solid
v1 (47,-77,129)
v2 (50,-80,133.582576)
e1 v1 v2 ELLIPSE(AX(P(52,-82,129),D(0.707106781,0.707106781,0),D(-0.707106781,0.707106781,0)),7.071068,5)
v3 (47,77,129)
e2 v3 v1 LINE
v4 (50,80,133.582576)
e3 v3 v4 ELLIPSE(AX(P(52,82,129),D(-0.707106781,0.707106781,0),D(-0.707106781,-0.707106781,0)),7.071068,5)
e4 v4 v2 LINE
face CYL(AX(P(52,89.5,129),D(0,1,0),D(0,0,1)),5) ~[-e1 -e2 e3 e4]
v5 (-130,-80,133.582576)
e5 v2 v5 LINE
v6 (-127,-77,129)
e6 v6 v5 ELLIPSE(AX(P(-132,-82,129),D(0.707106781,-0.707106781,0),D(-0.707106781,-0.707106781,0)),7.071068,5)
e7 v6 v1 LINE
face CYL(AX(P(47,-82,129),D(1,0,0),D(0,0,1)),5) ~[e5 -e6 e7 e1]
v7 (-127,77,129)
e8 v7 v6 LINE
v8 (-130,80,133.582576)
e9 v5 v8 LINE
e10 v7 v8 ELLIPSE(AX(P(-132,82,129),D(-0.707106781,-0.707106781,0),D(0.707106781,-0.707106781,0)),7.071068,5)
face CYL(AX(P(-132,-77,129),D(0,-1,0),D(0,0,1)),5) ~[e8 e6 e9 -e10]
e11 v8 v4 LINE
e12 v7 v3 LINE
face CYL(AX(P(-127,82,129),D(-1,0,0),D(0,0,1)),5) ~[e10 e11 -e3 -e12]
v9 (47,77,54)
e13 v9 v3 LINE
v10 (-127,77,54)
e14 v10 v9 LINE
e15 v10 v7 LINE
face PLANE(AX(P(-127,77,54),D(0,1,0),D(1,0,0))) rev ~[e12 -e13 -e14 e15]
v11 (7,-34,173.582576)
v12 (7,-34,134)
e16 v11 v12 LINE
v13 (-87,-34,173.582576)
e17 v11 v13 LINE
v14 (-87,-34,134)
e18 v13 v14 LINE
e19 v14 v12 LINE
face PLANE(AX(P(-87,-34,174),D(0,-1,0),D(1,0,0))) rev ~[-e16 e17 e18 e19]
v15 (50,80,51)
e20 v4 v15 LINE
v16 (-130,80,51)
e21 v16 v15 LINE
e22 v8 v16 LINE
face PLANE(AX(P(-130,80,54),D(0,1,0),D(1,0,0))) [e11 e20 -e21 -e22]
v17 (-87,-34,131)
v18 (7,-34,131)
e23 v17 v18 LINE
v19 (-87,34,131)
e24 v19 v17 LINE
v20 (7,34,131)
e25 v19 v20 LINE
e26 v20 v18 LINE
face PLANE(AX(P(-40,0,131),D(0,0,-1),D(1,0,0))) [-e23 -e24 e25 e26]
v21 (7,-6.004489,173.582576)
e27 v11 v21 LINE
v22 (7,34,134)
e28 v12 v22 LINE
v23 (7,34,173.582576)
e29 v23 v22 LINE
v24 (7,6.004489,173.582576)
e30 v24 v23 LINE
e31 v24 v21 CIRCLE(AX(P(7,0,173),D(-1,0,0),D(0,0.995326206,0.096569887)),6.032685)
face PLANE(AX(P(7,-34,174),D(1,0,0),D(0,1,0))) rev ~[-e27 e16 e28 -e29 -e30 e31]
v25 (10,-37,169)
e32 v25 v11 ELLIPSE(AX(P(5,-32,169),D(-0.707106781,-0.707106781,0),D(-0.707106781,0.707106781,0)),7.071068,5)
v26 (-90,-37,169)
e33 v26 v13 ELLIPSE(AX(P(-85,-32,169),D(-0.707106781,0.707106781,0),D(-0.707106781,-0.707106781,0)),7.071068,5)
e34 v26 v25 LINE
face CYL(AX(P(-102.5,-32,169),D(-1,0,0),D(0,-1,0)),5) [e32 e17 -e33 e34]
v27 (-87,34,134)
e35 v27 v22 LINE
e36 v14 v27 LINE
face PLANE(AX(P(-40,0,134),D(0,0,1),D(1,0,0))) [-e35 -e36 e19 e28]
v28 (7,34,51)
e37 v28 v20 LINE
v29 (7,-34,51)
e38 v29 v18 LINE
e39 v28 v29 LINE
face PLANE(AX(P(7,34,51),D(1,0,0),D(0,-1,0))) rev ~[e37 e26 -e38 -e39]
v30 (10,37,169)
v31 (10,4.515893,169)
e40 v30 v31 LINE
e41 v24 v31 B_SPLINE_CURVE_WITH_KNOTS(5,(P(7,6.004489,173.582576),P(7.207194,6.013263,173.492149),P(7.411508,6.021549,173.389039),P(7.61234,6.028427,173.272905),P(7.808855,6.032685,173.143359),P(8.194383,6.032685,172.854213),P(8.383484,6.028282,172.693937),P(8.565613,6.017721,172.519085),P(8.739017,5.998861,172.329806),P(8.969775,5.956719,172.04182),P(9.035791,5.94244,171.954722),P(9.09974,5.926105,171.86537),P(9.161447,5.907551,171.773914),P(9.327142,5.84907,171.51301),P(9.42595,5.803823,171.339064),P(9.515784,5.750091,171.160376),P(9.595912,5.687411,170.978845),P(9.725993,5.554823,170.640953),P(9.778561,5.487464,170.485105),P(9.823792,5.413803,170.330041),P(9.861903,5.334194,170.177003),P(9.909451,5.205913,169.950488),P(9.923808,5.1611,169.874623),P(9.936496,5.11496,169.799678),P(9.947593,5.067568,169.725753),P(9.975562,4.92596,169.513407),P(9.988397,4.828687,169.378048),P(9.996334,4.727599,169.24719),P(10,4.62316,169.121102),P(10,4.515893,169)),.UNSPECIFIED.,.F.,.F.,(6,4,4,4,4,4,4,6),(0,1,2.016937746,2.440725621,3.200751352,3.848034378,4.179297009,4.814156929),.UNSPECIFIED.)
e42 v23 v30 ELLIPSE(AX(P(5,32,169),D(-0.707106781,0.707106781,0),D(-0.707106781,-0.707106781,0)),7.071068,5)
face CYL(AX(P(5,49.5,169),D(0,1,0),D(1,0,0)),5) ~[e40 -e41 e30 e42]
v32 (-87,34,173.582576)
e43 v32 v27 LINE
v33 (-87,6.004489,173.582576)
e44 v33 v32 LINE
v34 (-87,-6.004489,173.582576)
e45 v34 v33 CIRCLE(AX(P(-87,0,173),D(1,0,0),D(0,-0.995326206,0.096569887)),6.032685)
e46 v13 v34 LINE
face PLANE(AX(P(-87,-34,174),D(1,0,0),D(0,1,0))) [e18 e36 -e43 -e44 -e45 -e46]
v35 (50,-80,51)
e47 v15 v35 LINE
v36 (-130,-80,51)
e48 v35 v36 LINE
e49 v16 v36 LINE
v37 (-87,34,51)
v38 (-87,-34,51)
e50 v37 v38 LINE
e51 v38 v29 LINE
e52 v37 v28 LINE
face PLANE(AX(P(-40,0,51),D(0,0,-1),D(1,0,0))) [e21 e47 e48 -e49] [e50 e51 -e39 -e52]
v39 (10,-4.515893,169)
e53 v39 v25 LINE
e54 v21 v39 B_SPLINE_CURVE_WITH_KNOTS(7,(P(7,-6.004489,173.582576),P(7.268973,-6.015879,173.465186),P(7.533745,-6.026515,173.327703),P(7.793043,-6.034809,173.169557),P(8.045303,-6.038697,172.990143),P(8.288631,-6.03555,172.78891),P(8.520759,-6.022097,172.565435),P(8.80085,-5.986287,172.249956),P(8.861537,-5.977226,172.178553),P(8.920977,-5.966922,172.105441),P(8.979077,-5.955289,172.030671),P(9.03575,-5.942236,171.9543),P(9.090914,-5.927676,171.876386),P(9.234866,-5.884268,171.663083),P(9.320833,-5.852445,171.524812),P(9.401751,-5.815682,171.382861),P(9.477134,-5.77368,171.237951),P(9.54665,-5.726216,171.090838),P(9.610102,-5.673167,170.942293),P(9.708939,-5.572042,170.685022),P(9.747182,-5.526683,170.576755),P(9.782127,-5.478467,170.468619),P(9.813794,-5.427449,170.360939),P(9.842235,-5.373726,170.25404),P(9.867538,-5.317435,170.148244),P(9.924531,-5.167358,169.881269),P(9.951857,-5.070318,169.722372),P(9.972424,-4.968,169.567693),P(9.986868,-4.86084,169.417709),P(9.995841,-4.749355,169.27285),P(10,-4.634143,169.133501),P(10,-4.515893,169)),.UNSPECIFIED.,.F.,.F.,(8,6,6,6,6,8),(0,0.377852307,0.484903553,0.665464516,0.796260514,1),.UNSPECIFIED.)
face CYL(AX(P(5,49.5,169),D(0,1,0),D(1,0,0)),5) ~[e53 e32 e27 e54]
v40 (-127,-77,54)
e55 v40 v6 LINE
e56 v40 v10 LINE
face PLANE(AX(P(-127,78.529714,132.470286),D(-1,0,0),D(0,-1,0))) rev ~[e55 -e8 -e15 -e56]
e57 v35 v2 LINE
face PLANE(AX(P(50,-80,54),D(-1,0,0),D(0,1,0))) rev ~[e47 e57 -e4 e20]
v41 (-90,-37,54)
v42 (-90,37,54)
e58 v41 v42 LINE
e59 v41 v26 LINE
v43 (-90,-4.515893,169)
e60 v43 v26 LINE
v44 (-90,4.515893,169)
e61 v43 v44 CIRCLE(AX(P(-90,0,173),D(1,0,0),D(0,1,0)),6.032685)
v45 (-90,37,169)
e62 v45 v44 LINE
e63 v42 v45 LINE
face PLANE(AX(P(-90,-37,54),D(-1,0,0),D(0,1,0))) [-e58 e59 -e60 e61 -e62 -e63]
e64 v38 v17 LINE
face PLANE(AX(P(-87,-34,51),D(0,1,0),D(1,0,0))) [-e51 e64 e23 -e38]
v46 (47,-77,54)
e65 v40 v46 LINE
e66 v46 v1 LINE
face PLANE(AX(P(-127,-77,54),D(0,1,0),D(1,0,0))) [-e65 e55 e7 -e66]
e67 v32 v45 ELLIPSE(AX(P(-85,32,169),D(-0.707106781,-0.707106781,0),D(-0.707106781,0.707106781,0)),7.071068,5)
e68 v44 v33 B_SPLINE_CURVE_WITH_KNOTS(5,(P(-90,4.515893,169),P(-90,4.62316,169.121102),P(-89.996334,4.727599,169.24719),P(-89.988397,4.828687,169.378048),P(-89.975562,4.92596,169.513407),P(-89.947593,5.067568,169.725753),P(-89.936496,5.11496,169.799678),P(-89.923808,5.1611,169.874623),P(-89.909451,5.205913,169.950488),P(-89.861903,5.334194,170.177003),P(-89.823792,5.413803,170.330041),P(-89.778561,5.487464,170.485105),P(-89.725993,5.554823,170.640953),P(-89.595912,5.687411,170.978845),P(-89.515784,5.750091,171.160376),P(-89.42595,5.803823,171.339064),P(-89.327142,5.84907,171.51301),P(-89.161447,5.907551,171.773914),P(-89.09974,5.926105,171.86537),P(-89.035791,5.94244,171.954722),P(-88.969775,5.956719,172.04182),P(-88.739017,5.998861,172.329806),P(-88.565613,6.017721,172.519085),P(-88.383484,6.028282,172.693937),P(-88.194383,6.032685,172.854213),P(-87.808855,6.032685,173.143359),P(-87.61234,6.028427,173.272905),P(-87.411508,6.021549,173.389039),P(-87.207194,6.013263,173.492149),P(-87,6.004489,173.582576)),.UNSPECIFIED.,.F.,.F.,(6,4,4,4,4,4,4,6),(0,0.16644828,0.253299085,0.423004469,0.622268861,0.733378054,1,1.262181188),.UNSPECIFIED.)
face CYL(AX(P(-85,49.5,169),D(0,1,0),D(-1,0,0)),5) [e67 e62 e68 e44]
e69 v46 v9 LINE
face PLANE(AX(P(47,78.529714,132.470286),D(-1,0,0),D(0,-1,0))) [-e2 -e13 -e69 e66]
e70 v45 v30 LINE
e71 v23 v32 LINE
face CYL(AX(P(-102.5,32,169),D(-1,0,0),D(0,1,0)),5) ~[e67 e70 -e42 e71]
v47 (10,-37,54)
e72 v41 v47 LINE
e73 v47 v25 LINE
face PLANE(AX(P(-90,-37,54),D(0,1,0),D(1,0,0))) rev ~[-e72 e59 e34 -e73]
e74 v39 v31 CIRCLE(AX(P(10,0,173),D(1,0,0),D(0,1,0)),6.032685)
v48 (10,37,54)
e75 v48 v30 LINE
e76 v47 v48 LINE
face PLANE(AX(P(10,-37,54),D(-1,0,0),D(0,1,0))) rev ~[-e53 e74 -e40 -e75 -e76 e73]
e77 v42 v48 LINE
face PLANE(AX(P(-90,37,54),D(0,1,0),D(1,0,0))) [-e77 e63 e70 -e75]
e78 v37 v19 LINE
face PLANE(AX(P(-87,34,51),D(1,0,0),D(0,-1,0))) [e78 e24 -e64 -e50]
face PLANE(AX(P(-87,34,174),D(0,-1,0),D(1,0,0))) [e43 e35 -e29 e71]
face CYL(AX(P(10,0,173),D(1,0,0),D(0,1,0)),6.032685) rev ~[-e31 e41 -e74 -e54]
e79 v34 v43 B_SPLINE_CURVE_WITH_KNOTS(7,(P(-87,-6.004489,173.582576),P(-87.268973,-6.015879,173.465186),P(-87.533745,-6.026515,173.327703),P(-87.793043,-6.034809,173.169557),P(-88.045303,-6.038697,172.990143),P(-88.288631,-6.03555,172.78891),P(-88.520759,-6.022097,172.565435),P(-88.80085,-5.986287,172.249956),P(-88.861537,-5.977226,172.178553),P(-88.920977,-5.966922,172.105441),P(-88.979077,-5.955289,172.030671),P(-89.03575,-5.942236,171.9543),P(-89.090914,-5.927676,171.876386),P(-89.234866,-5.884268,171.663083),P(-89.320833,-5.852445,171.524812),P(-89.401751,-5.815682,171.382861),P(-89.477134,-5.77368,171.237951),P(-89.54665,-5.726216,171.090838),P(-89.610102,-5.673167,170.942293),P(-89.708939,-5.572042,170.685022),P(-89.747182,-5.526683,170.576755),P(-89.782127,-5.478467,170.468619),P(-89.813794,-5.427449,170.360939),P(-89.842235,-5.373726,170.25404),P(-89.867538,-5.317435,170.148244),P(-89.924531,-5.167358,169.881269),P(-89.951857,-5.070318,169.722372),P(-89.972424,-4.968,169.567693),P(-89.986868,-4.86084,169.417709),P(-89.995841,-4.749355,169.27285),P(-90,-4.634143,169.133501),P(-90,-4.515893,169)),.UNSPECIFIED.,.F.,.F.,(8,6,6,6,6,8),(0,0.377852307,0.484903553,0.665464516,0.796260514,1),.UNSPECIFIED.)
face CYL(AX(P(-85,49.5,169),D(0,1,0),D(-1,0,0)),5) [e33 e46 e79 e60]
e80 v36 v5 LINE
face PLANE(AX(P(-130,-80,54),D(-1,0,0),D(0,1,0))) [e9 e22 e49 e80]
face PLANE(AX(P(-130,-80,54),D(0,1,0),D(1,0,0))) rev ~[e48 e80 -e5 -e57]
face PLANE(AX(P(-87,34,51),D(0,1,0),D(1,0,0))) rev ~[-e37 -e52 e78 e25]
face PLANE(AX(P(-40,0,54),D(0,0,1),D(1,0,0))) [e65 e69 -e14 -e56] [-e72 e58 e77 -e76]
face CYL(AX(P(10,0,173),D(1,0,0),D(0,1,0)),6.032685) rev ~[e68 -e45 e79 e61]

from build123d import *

# Parameters (mm, degrees)
F0_W          = 180
F0_H          = 160
F1_DEPTH      = 1
F2_W          = 10
F2_H          = 10
F3_DEPTH      = 50
F4_T          = 1
F4_T3_DEPTH   = 12
F4_T5_DEPTH   = 12
F4_T7_DEPTH   = 12
F4_T9_DEPTH   = 12
F5_W          = 180
F5_H          = 160
F6_DEPTH      = 3
F7_W          = 180
F7_H          = 160
F7_W_2        = 174
F7_H_2        = 154
F8_DEPTH      = 80
F9_W          = 100
F9_H          = 74
F10_DEPTH     = 120
F11_W         = 94
F11_H         = 68
F12_DEPTH     = 40
F14_T1_DEPTH  = 125
F14_T3_DEPTH  = 99
F14_T5_DEPTH  = 174
F14_T7_DEPTH  = 154
F14_T13_DEPTH = 166.5
F14_T19_DEPTH = 186.5
F14_T28_DEPTH = 166.5
F14_T34_DEPTH = 186.5
F14_T43_DEPTH = 186.5
F14_T49_DEPTH = 166.5
F14_T58_DEPTH = 166.5
F14_T64_DEPTH = 186.5
F15_R         = 6.0326848408
F16_DEPTH     = 500
F17_W         = 180
F17_H         = 160
F18_DEPTH     = 51
F13_W         = 94
F13_H         = 68
F19_DEPTH     = 80


# Not quite as in the source:
# - a fillet or chamfer that OpenCascade refuses, or shapes differently, is made with other operations: its cross-section is extruded or revolved along the edge and cut away or added
# - a shell that OpenCascade refuses in one call is made with other operations: the cavity is built on its own and cut out


with BuildPart() as f1:
    # F0 (on Top) → F1 (new body)
    with BuildSketch(Plane.XY):
        with Locations((-40, 0)):
            Rectangle(F0_W, F0_H)
    extrude(amount=F1_DEPTH)

    # F2 (on face) → F3 (join)
    with BuildSketch(Plane.XY.offset(1)):
        with Locations((-125, 75)):
            Rectangle(F2_W, F2_H)
        with Locations((45, 75)):
            Rectangle(F2_W, F2_H)
        with Locations((-125, -75)):
            Rectangle(F2_W, F2_H)
        with Locations((45, -75)):
            Rectangle(F2_W, F2_H)
    extrude(amount=F3_DEPTH)

    # F4: shell of thickness 1, made by hand


with BuildPart() as f4_core1:
    # F4_t2: copy of F1
    add(f1.part)

    # the walls: a layer under each face that stays
    f4_faces = [f4_core1.faces().sort_by_distance(p)[0] for p in [
        (44, 80, 49.3),
        (-124, -80, 49.3),
        (45, -75, 51),
        (45, -70, 26),
        (40, -75, 26),
        (-120, -75, 26),
        (-125, -70, 26),
        (-125, -75, 51),
        (-130, 74.6666666667, 49.3),
        (-125, 70, 26),
        (-125, 75, 51),
        (-120, 75, 26),
        (-40, 0, 1),
        (45, 70, 26),
        (40, 75, 26),
        (45, 75, 51),
        (50, -74.6666666667, 49.3),
    ]]
    thicken(f4_faces, amount=-F4_T, mode=Mode.SUBTRACT)

    # F4_s4 → F4_t3 (cut)
    with BuildSketch(Plane.YZ.offset(39)):
        Polygon((-69.99, 1.01), (-71, 1), (-71, 0), (-70, 0), align=None)
        Polygon((69.99, 1.01), (70, 0), (71, 0), (71, 1), align=None)
    extrude(amount=F4_T3_DEPTH, mode=Mode.SUBTRACT)

    # F4_s6 → F4_t5 (cut)
    with BuildSketch(Plane.XZ.offset(69)):
        Polygon((39.99, 1.01), (41, 1), (41, 0), (40, 0), align=None)
        Polygon((-119.99, 1.01), (-121, 1), (-121, 0), (-120, 0), align=None)
    extrude(amount=F4_T5_DEPTH, mode=Mode.SUBTRACT)

    # F4_s8 → F4_t7 (cut)
    with BuildSketch(Plane.YZ.offset(-131)):
        Polygon((-69.99, 1.01), (-71, 1), (-71, 0), (-70, 0), align=None)
        Polygon((69.99, 1.01), (71, 1), (71, 0), (70, 0), align=None)
    extrude(amount=F4_T7_DEPTH, mode=Mode.SUBTRACT)

    # F4_s10 → F4_t9 (cut)
    with BuildSketch(Plane.XZ.offset(-81)):
        Polygon((-119.99, 1.01), (-121, 1), (-121, 0), (-120, 0), align=None)
        Polygon((39.99, 1.01), (40, 0), (41, 0), (41, 1), align=None)
    extrude(amount=F4_T9_DEPTH, mode=Mode.SUBTRACT)


with BuildPart() as f1_1:
    add(f1.part)

    # what is left inside the walls is the cavity
    f4_cavity = [f4_core1.part.solids().sort_by_distance(p)[0] for p in [
        (45, 78.99, 33.333333),
        (-125, 78.99, 33.333333),
        (48.99, -75, 33.333333),
        (-123.666667, -71.01, 25),
    ]]
    add(f4_cavity, mode=Mode.SUBTRACT)

    # F5 (on face) → F6 (join)
    with BuildSketch(Plane.XY.offset(51)):
        with Locations((-40, 0)):
            Rectangle(F5_W, F5_H)
    extrude(amount=F6_DEPTH)

    # F7 (on face) → F8 (join)
    with BuildSketch(Plane.XY.offset(54)):
        with Locations((-40, 0)):
            Rectangle(F7_W, F7_H)
        with Locations((-40, 0)):
            Rectangle(F7_W_2, F7_H_2, mode=Mode.SUBTRACT)
    extrude(amount=F8_DEPTH)

    # F9 (on face) → F10 (join)
    with BuildSketch(Plane.XY.offset(54)):
        with Locations((-40, 0)):
            Rectangle(F9_W, F9_H)
    extrude(amount=F10_DEPTH)

    # F11 (on face) → F12 (cut)
    with BuildSketch(Plane.XY.offset(174)):
        with Locations((-40, 0)):
            Rectangle(F11_W, F11_H)
    extrude(amount=-F12_DEPTH, mode=Mode.SUBTRACT)

    # F14: fillet of radius 5 on 8 edges, made by hand

    # F14_s2 → F14_t1 (cut)
    with BuildSketch(Plane.YZ.offset(-102.5)):
        with BuildLine():
            ThreePointArc((-37, 169), (-35.5355339059, 172.5355339059), (-32, 174))
            Line((-32, 174), (-37, 174))
            Line((-37, 174), (-37, 169))
        make_face()
        with BuildLine():
            ThreePointArc((37, 169), (35.5355339059, 172.5355339059), (32, 174))
            Line((32, 174), (37, 174))
            Line((37, 174), (37, 169))
        make_face()
    extrude(amount=F14_T1_DEPTH, mode=Mode.SUBTRACT)

    # F14_s4 → F14_t3 (cut)
    with BuildSketch(Plane.XZ.offset(-49.5)):
        with BuildLine():
            ThreePointArc((-90, 169), (-88.5355339059, 172.5355339059), (-85, 174))
            Line((-85, 174), (-90, 174))
            Line((-90, 174), (-90, 169))
        make_face()
        with BuildLine():
            ThreePointArc((10, 169), (8.5355339059, 172.5355339059), (5, 174))
            Line((5, 174), (10, 174))
            Line((10, 174), (10, 169))
        make_face()
    extrude(amount=F14_T3_DEPTH, mode=Mode.SUBTRACT)

    # F14_s6 → F14_t5 (cut)
    with BuildSketch(Plane.YZ.offset(-127)):
        with BuildLine():
            ThreePointArc((-82, 134), (-78.4644660941, 132.5355339059), (-77, 129))
            Line((-77, 129), (-77, 134))
            Line((-77, 134), (-82, 134))
        make_face()
        with BuildLine():
            ThreePointArc((82, 134), (78.4644660941, 132.5355339059), (77, 129))
            Line((77, 129), (77, 134))
            Line((77, 134), (82, 134))
        make_face()
    extrude(amount=F14_T5_DEPTH, mode=Mode.SUBTRACT)

    # F14_s8 → F14_t7 (cut)
    with BuildSketch(Plane.XZ.offset(-77)):
        with BuildLine():
            ThreePointArc((52, 134), (48.4644660941, 132.5355339059), (47, 129))
            Line((47, 129), (47, 134))
            Line((47, 134), (52, 134))
        make_face()
        with BuildLine():
            ThreePointArc((-132, 134), (-128.4644660941, 132.5355339059), (-127, 129))
            Line((-127, 129), (-127, 134))
            Line((-127, 134), (-132, 134))
        make_face()
    extrude(amount=F14_T7_DEPTH, mode=Mode.SUBTRACT)


with BuildPart() as f14_tool11:
    # F14_s12 → F14_t13 (new body)
    with BuildSketch(Plane.XZ.offset(-77)):
        with BuildLine():
            ThreePointArc((52, 134), (48.4644660941, 132.5355339059), (47, 129))
            Line((47, 129), (47, 134))
            Line((47, 134), (52, 134))
        make_face()
    extrude(amount=F14_T13_DEPTH)

    split(bisect_by=Plane.YZ.offset(50), keep=Keep.BOTTOM)

    split(bisect_by=Plane.XZ.offset(80), keep=Keep.BOTTOM)

    split(bisect_by=Plane.XZ.offset(77), keep=Keep.TOP)


with BuildPart() as f14_tool17:
    # F14_s18 → F14_t19 (new body)
    with BuildSketch(Plane.YZ.offset(59.5)):
        with BuildLine():
            ThreePointArc((-82, 134), (-78.4644660941, 132.5355339059), (-77, 129))
            Line((-77, 129), (-77, 134))
            Line((-77, 134), (-82, 134))
        make_face()
    extrude(amount=-F14_T19_DEPTH)

    split(bisect_by=Plane.YZ.offset(50), keep=Keep.BOTTOM)

    split(bisect_by=Plane.XZ.offset(80), keep=Keep.BOTTOM)

    split(bisect_by=Plane.YZ.offset(47), keep=Keep.TOP)


with BuildPart() as f14_tool11_1:
    add(f14_tool11.part)

    # F14_t23: intersect F14_tool17
    add(f14_tool17.part, mode=Mode.INTERSECT)


with BuildPart() as f1_2:
    add(f1_1.part)

    # F14_t9: cut F14_tool11
    add(f14_tool11_1.part, mode=Mode.SUBTRACT)


with BuildPart() as f14_tool26:
    # F14_s27 → F14_t28 (new body)
    with BuildSketch(Plane.XZ.offset(89.5)):
        with BuildLine():
            ThreePointArc((-132, 134), (-128.4644660941, 132.5355339059), (-127, 129))
            Line((-127, 129), (-127, 134))
            Line((-127, 134), (-132, 134))
        make_face()
    extrude(amount=-F14_T28_DEPTH)

    split(bisect_by=Plane.YZ.offset(-130), keep=Keep.TOP)

    split(bisect_by=Plane.XZ.offset(80), keep=Keep.BOTTOM)

    split(bisect_by=Plane.XZ.offset(77), keep=Keep.TOP)


with BuildPart() as f14_tool32:
    # F14_s33 → F14_t34 (new body)
    with BuildSketch(Plane.YZ.offset(47)):
        with BuildLine():
            ThreePointArc((-82, 134), (-78.4644660941, 132.5355339059), (-77, 129))
            Line((-77, 129), (-77, 134))
            Line((-77, 134), (-82, 134))
        make_face()
    extrude(amount=-F14_T34_DEPTH)

    split(bisect_by=Plane.YZ.offset(-130), keep=Keep.TOP)

    split(bisect_by=Plane.XZ.offset(80), keep=Keep.BOTTOM)

    split(bisect_by=Plane.YZ.offset(-127), keep=Keep.BOTTOM)


with BuildPart() as f14_tool26_1:
    add(f14_tool26.part)

    # F14_t38: intersect F14_tool32
    add(f14_tool32.part, mode=Mode.INTERSECT)


with BuildPart() as f1_3:
    add(f1_2.part)

    # F14_t24: cut F14_tool26
    add(f14_tool26_1.part, mode=Mode.SUBTRACT)


with BuildPart() as f14_tool41:
    # F14_s42 → F14_t43 (new body)
    with BuildSketch(Plane.YZ.offset(-127)):
        with BuildLine():
            ThreePointArc((82, 134), (78.4644660941, 132.5355339059), (77, 129))
            Line((77, 129), (77, 134))
            Line((77, 134), (82, 134))
        make_face()
    extrude(amount=F14_T43_DEPTH)

    split(bisect_by=Plane.XZ.offset(-80), keep=Keep.TOP)

    split(bisect_by=Plane.YZ.offset(50), keep=Keep.BOTTOM)

    split(bisect_by=Plane.YZ.offset(47), keep=Keep.TOP)


with BuildPart() as f14_tool47:
    # F14_s48 → F14_t49 (new body)
    with BuildSketch(Plane.XZ.offset(-89.5)):
        with BuildLine():
            ThreePointArc((52, 134), (48.4644660941, 132.5355339059), (47, 129))
            Line((47, 129), (47, 134))
            Line((47, 134), (52, 134))
        make_face()
    extrude(amount=F14_T49_DEPTH)

    split(bisect_by=Plane.XZ.offset(-80), keep=Keep.TOP)

    split(bisect_by=Plane.YZ.offset(50), keep=Keep.BOTTOM)

    split(bisect_by=Plane.XZ.offset(-77), keep=Keep.BOTTOM)


with BuildPart() as f14_tool41_1:
    add(f14_tool41.part)

    # F14_t53: intersect F14_tool47
    add(f14_tool47.part, mode=Mode.INTERSECT)


with BuildPart() as f1_4:
    add(f1_3.part)

    # F14_t39: cut F14_tool41
    add(f14_tool41_1.part, mode=Mode.SUBTRACT)


with BuildPart() as f14_tool56:
    # F14_s57 → F14_t58 (new body)
    with BuildSketch(Plane.XZ.offset(77)):
        with BuildLine():
            ThreePointArc((-132, 134), (-128.4644660941, 132.5355339059), (-127, 129))
            Line((-127, 129), (-127, 134))
            Line((-127, 134), (-132, 134))
        make_face()
    extrude(amount=-F14_T58_DEPTH)

    split(bisect_by=Plane.XZ.offset(-80), keep=Keep.TOP)

    split(bisect_by=Plane.YZ.offset(-130), keep=Keep.TOP)

    split(bisect_by=Plane.XZ.offset(-77), keep=Keep.BOTTOM)


with BuildPart() as f14_tool62:
    # F14_s63 → F14_t64 (new body)
    with BuildSketch(Plane.YZ.offset(-139.5)):
        with BuildLine():
            ThreePointArc((82, 134), (78.4644660941, 132.5355339059), (77, 129))
            Line((77, 129), (77, 134))
            Line((77, 134), (82, 134))
        make_face()
    extrude(amount=F14_T64_DEPTH)

    split(bisect_by=Plane.XZ.offset(-80), keep=Keep.TOP)

    split(bisect_by=Plane.YZ.offset(-130), keep=Keep.TOP)

    split(bisect_by=Plane.YZ.offset(-127), keep=Keep.BOTTOM)


with BuildPart() as f14_tool56_1:
    add(f14_tool56.part)

    # F14_t68: intersect F14_tool62
    add(f14_tool62.part, mode=Mode.INTERSECT)


with BuildPart() as f1_5:
    add(f1_4.part)

    # F14_t54: cut F14_tool56
    add(f14_tool56_1.part, mode=Mode.SUBTRACT)

    # F15 (on face) → F16 (cut)
    with BuildSketch(Plane.YZ.offset(10)):
        with Locations((0, 173)):
            Circle(F15_R)
    extrude(amount=-F16_DEPTH, mode=Mode.SUBTRACT)

    # F17 (on face) → F18 (cut)
    with BuildSketch(Plane(origin=(0, 0, 0), x_dir=(1, 0, 0), z_dir=(0, 0, -1))):
        with Locations((-40, 0)):
            Rectangle(F17_W, F17_H)
    extrude(amount=-F18_DEPTH, mode=Mode.SUBTRACT)

    # F13 (on face) → F19 (cut)
    with BuildSketch(Plane(origin=(0, 0, 51), x_dir=(1, 0, 0), z_dir=(0, 0, -1))):
        with Locations((-40, 0)):
            Rectangle(F13_W, F13_H)
    extrude(amount=-F19_DEPTH, mode=Mode.SUBTRACT)


solid = f1_5.part
